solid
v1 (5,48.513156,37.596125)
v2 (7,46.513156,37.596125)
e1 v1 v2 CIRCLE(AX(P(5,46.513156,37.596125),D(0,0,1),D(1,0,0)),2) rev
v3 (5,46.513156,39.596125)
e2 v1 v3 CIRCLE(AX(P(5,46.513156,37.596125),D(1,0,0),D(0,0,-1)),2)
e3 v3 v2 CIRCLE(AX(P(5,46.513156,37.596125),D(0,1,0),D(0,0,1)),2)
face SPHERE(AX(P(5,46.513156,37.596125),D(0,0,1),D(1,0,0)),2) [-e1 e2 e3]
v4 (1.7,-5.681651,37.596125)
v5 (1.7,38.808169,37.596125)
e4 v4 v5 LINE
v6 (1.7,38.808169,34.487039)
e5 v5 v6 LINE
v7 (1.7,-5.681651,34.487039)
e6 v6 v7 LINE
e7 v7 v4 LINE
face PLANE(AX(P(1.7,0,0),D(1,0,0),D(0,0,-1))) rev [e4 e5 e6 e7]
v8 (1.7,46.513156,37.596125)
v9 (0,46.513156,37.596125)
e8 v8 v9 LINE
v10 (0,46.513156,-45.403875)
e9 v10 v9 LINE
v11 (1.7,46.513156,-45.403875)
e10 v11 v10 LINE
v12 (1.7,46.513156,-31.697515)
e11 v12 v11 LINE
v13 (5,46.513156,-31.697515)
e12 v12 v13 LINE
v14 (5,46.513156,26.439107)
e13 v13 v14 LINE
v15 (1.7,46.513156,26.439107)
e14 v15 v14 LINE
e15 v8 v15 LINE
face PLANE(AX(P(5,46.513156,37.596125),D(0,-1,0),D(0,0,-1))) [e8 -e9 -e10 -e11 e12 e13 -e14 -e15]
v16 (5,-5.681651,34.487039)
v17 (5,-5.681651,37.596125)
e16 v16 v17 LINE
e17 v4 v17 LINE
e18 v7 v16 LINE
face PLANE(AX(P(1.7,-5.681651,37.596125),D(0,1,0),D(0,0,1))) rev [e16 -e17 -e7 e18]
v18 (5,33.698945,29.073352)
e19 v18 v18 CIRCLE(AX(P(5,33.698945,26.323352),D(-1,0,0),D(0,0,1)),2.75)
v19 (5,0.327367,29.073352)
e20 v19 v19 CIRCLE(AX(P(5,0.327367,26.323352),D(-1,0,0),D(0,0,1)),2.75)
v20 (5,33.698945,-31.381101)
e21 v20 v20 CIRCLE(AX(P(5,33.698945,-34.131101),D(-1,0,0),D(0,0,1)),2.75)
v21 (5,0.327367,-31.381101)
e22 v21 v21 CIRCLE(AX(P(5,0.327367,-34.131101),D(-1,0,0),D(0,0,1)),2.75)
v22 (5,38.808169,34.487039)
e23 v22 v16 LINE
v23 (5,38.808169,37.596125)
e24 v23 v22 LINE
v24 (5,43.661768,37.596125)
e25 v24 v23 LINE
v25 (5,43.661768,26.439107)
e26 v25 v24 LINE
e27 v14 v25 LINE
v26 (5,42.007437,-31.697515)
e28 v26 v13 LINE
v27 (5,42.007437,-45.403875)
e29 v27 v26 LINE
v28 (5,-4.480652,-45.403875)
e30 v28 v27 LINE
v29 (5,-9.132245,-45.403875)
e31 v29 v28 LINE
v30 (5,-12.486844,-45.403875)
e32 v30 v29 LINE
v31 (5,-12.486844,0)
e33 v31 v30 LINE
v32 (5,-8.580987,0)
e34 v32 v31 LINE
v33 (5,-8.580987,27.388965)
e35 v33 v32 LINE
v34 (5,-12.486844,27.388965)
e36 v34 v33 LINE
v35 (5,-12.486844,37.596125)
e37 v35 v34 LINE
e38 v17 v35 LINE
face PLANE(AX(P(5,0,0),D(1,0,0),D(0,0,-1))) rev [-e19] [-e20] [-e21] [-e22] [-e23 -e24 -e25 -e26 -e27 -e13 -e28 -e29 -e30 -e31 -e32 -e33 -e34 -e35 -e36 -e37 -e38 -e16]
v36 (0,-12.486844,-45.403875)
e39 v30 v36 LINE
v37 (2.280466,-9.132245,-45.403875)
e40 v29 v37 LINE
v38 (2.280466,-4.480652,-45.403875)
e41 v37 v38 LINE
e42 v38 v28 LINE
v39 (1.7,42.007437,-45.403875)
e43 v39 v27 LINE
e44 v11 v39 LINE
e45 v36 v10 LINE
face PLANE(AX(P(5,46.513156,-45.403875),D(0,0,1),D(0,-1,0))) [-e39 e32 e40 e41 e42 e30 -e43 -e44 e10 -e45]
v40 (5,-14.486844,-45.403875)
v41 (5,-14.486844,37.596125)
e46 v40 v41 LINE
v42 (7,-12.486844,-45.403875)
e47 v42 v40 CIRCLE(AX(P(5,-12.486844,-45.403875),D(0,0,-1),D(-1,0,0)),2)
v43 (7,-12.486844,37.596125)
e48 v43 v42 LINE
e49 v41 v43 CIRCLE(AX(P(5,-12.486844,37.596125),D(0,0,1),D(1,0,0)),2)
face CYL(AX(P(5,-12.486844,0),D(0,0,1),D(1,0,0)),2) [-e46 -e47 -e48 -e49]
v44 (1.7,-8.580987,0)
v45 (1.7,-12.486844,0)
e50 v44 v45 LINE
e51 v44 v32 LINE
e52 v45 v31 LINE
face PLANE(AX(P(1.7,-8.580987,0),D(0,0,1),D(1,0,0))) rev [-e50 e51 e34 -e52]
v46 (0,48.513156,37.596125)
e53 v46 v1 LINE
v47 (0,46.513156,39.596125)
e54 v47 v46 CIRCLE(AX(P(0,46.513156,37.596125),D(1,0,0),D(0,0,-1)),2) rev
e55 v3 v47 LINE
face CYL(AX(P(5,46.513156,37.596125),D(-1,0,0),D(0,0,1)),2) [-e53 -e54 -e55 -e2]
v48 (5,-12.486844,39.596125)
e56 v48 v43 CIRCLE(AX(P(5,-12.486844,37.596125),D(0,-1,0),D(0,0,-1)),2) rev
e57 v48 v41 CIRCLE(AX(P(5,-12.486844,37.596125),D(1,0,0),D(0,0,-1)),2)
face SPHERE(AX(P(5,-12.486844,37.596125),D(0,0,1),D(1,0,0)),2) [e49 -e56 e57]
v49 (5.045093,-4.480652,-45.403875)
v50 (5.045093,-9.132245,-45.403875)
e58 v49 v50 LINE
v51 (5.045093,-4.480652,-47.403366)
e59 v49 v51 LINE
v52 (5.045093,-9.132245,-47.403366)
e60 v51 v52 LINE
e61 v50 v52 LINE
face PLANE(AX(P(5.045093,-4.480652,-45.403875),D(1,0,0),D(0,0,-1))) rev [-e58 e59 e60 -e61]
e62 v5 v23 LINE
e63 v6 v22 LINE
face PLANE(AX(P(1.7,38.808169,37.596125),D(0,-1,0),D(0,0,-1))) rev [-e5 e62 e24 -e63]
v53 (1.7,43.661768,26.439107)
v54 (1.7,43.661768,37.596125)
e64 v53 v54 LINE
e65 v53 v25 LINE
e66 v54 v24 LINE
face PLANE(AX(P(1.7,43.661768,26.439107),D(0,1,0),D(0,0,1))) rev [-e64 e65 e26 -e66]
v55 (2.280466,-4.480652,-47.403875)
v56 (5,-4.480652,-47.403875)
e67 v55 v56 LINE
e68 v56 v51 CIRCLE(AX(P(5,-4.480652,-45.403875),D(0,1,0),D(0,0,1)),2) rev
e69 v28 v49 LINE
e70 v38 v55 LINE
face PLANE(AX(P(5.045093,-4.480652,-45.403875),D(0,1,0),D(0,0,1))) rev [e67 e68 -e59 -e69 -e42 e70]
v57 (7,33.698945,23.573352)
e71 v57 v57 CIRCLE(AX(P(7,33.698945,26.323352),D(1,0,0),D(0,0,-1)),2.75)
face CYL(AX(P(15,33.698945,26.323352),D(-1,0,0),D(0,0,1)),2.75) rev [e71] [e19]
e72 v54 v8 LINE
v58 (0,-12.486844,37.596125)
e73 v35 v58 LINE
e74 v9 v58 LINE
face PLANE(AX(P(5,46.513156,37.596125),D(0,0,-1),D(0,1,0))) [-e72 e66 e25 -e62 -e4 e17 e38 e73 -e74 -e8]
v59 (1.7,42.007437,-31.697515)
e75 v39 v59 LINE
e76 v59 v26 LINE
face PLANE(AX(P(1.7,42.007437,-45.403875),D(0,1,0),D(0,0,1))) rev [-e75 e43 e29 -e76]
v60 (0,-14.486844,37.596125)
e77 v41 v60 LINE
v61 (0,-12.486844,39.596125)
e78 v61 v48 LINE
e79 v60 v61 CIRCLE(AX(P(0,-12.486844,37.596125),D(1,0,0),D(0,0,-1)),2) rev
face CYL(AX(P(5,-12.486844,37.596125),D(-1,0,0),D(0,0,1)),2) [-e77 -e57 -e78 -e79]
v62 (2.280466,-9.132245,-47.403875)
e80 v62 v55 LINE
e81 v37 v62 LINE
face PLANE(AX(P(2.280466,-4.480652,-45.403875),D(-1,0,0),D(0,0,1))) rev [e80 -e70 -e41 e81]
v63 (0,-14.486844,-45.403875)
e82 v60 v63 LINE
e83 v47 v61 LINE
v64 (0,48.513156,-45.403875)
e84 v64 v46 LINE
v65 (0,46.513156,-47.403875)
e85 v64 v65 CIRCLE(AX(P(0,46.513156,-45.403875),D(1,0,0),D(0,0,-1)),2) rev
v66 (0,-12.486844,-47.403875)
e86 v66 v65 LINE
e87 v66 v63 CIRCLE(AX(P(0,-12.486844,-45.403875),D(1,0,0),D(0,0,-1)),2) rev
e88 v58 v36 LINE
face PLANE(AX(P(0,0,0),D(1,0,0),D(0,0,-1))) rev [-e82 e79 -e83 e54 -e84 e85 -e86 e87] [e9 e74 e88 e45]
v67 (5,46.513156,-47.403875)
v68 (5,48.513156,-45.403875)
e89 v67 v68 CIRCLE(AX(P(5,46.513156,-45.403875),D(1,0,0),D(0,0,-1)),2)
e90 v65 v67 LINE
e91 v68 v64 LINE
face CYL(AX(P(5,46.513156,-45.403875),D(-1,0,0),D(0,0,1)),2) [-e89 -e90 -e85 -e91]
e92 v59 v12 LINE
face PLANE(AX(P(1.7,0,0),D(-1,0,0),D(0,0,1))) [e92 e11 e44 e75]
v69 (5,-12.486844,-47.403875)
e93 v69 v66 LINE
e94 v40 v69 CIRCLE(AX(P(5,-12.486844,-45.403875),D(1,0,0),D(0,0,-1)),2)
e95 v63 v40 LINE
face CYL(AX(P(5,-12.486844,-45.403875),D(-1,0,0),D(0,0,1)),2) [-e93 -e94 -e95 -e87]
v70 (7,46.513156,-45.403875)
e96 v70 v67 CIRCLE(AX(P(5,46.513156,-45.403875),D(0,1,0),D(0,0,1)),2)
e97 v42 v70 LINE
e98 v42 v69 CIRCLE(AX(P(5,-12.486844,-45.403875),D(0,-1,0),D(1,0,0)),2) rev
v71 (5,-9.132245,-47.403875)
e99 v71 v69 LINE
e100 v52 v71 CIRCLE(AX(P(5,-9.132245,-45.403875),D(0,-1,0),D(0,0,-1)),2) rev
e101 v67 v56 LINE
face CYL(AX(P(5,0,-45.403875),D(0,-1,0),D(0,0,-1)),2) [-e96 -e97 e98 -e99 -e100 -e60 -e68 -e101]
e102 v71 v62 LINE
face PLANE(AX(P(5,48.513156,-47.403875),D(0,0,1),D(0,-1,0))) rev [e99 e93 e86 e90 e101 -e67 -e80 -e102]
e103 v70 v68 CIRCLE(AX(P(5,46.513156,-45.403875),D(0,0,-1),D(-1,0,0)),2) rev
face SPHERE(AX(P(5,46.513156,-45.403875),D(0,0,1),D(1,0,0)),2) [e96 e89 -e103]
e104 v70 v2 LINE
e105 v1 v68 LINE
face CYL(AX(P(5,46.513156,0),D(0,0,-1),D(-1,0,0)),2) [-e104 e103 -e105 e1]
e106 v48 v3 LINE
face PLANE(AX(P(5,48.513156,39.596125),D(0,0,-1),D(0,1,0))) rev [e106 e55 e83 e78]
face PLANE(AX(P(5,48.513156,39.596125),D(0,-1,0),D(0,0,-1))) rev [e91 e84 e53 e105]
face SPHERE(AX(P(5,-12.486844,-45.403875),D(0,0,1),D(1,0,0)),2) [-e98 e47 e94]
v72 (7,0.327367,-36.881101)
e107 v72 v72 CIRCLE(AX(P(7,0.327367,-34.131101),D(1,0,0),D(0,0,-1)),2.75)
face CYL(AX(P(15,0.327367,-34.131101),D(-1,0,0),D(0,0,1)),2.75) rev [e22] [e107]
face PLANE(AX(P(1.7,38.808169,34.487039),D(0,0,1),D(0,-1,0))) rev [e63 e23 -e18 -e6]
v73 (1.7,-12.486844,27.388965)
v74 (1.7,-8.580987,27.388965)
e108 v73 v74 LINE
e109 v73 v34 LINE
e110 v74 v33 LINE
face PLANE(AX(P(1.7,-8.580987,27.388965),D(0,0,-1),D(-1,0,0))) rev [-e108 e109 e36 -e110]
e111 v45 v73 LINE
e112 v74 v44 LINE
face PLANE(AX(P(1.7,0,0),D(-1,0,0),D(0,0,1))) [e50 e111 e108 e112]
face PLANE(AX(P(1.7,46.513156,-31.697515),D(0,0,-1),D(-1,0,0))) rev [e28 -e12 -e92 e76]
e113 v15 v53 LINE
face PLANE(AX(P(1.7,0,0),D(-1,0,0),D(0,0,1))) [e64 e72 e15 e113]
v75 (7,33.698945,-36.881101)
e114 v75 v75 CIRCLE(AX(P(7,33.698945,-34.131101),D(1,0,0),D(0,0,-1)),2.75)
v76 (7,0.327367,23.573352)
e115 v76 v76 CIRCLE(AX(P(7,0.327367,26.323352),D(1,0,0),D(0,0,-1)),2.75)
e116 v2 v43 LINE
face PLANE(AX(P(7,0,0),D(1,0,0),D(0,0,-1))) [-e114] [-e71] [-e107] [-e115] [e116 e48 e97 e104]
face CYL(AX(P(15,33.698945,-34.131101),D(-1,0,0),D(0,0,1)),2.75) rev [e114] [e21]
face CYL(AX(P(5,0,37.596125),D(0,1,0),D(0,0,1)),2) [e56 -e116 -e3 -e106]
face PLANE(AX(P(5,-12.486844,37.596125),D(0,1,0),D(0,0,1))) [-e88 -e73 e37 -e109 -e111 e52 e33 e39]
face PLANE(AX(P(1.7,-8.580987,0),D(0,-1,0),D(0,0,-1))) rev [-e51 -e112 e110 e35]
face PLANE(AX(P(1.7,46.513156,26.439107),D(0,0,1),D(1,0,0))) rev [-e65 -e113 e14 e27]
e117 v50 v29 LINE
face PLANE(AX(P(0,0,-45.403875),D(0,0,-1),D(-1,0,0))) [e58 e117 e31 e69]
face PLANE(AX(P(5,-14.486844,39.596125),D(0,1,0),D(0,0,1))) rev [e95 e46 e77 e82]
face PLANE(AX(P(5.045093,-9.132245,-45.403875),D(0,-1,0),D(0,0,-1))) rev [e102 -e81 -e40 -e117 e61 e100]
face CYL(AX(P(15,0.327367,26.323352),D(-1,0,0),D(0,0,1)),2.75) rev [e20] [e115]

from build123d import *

# Parameters (mm, degrees)
SKETCH_1_W          = 87
SKETCH_1_H          = 63
SKETCH_1_W_2        = 83
SKETCH_1_H_2        = 59
EXTRUDE_1_DEPTH     = 5
SKETCH_2_W          = 87
SKETCH_2_H          = 63
EXTRUDE_2_DEPTH     = 2
SKETCH_3_W          = 2.764626384
SKETCH_3_H          = 4.6515936
CUT_EXTRUDE_1_DEPTH = 2
FILLET_1_R          = 2
SKETCH_4_W          = 27.388964673
SKETCH_4_H          = 3.905856672
SKETCH_4_W_2        = 13.70635998
SKETCH_4_H_2        = 4.505719406
SKETCH_4_W_3        = 11.157018238
SKETCH_4_H_3        = 2.851387493
SKETCH_4_W_4        = 3.109085913
SKETCH_4_H_4        = 44.489819457
EXTRUDE_3_DEPTH     = 3.3
SKETCH_5_R          = 2.75
CUT_EXTRUDE_2_DEPTH = 10


with BuildPart() as part:
    # 草图1 → 凸台-拉伸1 (new body)
    with BuildSketch(Plane(origin=(0, 0, 0), x_dir=(0, 0, -1), z_dir=(1, 0, 0))):
        with Locations((3.90387463, 17.013155975)):
            Rectangle(SKETCH_1_W, SKETCH_1_H)
        with Locations((3.90387463, 17.013155975)):
            Rectangle(SKETCH_1_W_2, SKETCH_1_H_2, mode=Mode.SUBTRACT)
    extrude(amount=EXTRUDE_1_DEPTH)

    # 草图2 → 凸台-拉伸2 (add)
    with BuildSketch(Plane(origin=(5, 0, 0), x_dir=(0, 0, -1), z_dir=(1, 0, 0))):
        with Locations((3.90387463, 17.013155975)):
            Rectangle(SKETCH_2_W, SKETCH_2_H)
    extrude(amount=EXTRUDE_2_DEPTH)

    # 草图3 → 切除-拉伸1 (cut)
    with BuildSketch(Plane(origin=(0, 0, -47.40387463), x_dir=(-1, 0, 0), z_dir=(0, 0, -1))):
        with Locations((-3.662779601, -6.806448474)):
            Rectangle(SKETCH_3_W, SKETCH_3_H)
    extrude(amount=-CUT_EXTRUDE_1_DEPTH, mode=Mode.SUBTRACT)

    # 圆角1
    # the kernel refuses this fillet: 2 mm, written as the material it takes off along each edge
    with BuildSketch(Plane(origin=(5, 46.513155975, -45.40387463), x_dir=(1, 0, 0), z_dir=(0, 1, 0))) as fillet_1_piece_1_section:
        Polygon((0, 0), (FILLET_1_R, 0), (FILLET_1_R, FILLET_1_R), (0, FILLET_1_R), align=None)
    fillet_1_piece_1 = extrude(amount=FILLET_1_R, mode=Mode.PRIVATE)
    fillet_1_piece_1 = fillet_1_piece_1 - Plane(origin=(5, 46.513155975, -45.40387463), x_dir=(-0.7071067811865475, 0, 0.7071067811865475), z_dir=(0, 1, 0)) * Sphere(FILLET_1_R, mode=Mode.PRIVATE)
    add(fillet_1_piece_1, mode=Mode.SUBTRACT)
    with BuildSketch(Plane(origin=(5, -12.486844025, -45.40387463), x_dir=(0, 0, -1), z_dir=(1, 0, 0))) as fillet_1_piece_2_section:
        Polygon((0, 0), (FILLET_1_R, 0), (FILLET_1_R, -FILLET_1_R), (0, -FILLET_1_R), align=None)
    fillet_1_piece_2 = extrude(amount=FILLET_1_R, mode=Mode.PRIVATE)
    fillet_1_piece_2 = fillet_1_piece_2 - Plane(origin=(5, -12.486844025, -45.40387463), x_dir=(0, 0.7071067811865474, 0.7071067811865476), z_dir=(1, 0, 0)) * Sphere(FILLET_1_R, mode=Mode.PRIVATE)
    add(fillet_1_piece_2, mode=Mode.SUBTRACT)
    with BuildSketch(Plane(origin=(5, -12.486844025, 37.59612537), x_dir=(1, 0, 0), z_dir=(0, 0, 1))) as fillet_1_piece_3_section:
        Polygon((0, 0), (FILLET_1_R, 0), (FILLET_1_R, -FILLET_1_R), (0, -FILLET_1_R), align=None)
    fillet_1_piece_3 = extrude(amount=FILLET_1_R, mode=Mode.PRIVATE)
    fillet_1_piece_3 = fillet_1_piece_3 - Plane(origin=(5, -12.486844025, 37.59612537), x_dir=(-0.7071067811865475, 0.7071067811865475, 0), z_dir=(0, 0, 1)) * Sphere(FILLET_1_R, mode=Mode.PRIVATE)
    add(fillet_1_piece_3, mode=Mode.SUBTRACT)
    with BuildSketch(Plane(origin=(5, 46.513155975, 37.59612537), x_dir=(0, 0, 1), z_dir=(0, 1, 0))) as fillet_1_piece_4_section:
        Polygon((0, 0), (FILLET_1_R, 0), (FILLET_1_R, FILLET_1_R), (0, FILLET_1_R), align=None)
    fillet_1_piece_4 = extrude(amount=FILLET_1_R, mode=Mode.PRIVATE)
    fillet_1_piece_4 = fillet_1_piece_4 - Plane(origin=(5, 46.513155975, 37.59612537), x_dir=(-0.7071067811865475, 0, -0.7071067811865475), z_dir=(0, 1, 0)) * Sphere(FILLET_1_R, mode=Mode.PRIVATE)
    add(fillet_1_piece_4, mode=Mode.SUBTRACT)
    with BuildSketch(Plane(origin=(5, 48.513155975, -47.40387463), x_dir=(0, 0, 1), z_dir=(-1, 0, 0)), Plane(origin=(5, -14.486844025, -47.40387463), x_dir=(0, 1, 0), z_dir=(-1, 0, 0)), Plane(origin=(-5, -14.486844025, 39.59612537), x_dir=(0, 1, 0), z_dir=(1, 0, 0)), Plane(origin=(-5, 48.513155975, 39.59612537), x_dir=(0, 0, -1), z_dir=(1, 0, 0))) as fillet_1_piece_5:
        with BuildLine():
            CenterArc((FILLET_1_R, -FILLET_1_R), FILLET_1_R, 90, 90)
            Line((0, -FILLET_1_R), (0, 0))
            Line((0, 0), (FILLET_1_R, 0))
        make_face()
    extrude(amount=10, mode=Mode.SUBTRACT)
    with BuildSketch(Plane(origin=(7, 48.513155975, 37.59612537), x_dir=(-1, 0, 0), z_dir=(0, 0, -1))) as fillet_1_piece_6:
        with BuildLine():
            CenterArc((FILLET_1_R, -FILLET_1_R), FILLET_1_R, 90, 90)
            Line((0, -FILLET_1_R), (0, 0))
            Line((0, 0), (FILLET_1_R, 0))
        make_face()
    extrude(amount=83, mode=Mode.SUBTRACT)
    with BuildSketch(Plane(origin=(7, 46.513155975, -47.40387463), x_dir=(0, 0, 1), z_dir=(0, -1, 0))) as fillet_1_piece_7:
        with BuildLine():
            CenterArc((FILLET_1_R, FILLET_1_R), FILLET_1_R, 180, 90)
            Line((0, FILLET_1_R), (0, 0))
            Line((0, 0), (FILLET_1_R, 0))
        make_face()
    extrude(amount=59, mode=Mode.SUBTRACT)
    with BuildSketch(Plane(origin=(7, -14.486844025, -45.40387463), x_dir=(0, 1, 0), z_dir=(0, 0, 1))) as fillet_1_piece_8:
        with BuildLine():
            CenterArc((FILLET_1_R, FILLET_1_R), FILLET_1_R, 180, 90)
            Line((0, FILLET_1_R), (0, 0))
            Line((0, 0), (FILLET_1_R, 0))
        make_face()
    extrude(amount=83, mode=Mode.SUBTRACT)
    with BuildSketch(Plane(origin=(7, -12.486844025, 39.59612537), x_dir=(-1, 0, 0), z_dir=(0, 1, 0))) as fillet_1_piece_9:
        with BuildLine():
            CenterArc((FILLET_1_R, -FILLET_1_R), FILLET_1_R, 90, 90)
            Line((0, -FILLET_1_R), (0, 0))
            Line((0, 0), (FILLET_1_R, 0))
        make_face()
    extrude(amount=59, mode=Mode.SUBTRACT)

    # 草图4 → 凸台-拉伸3 (add)
    with BuildSketch(Plane.ZY.offset(-5)):
        with Locations((13.694482337, -10.533915689)):
            Rectangle(SKETCH_4_W, SKETCH_4_H)
        with Locations((-38.55069464, 44.260296272)):
            Rectangle(SKETCH_4_W_2, SKETCH_4_H_2)
        with Locations((32.017616251, 45.087462229)):
            Rectangle(SKETCH_4_W_3, SKETCH_4_H_3)
        with Locations((36.041582414, 16.563258925)):
            Rectangle(SKETCH_4_W_4, SKETCH_4_H_4)
    extrude(amount=EXTRUDE_3_DEPTH)

    # 草图5 → 切除-拉伸2 (cut)
    with BuildSketch(Plane.ZY.offset(-5)):
        with Locations((-34.13110136, 33.698944985)):
            Circle(SKETCH_5_R)
        with Locations((26.3233521, 33.698944985)):
            Circle(SKETCH_5_R)
        with Locations((-34.13110136, 0.327366965)):
            Circle(SKETCH_5_R)
        with Locations((26.3233521, 0.327366965)):
            Circle(SKETCH_5_R)
    extrude(amount=-CUT_EXTRUDE_2_DEPTH, mode=Mode.SUBTRACT)


solid = part.part
